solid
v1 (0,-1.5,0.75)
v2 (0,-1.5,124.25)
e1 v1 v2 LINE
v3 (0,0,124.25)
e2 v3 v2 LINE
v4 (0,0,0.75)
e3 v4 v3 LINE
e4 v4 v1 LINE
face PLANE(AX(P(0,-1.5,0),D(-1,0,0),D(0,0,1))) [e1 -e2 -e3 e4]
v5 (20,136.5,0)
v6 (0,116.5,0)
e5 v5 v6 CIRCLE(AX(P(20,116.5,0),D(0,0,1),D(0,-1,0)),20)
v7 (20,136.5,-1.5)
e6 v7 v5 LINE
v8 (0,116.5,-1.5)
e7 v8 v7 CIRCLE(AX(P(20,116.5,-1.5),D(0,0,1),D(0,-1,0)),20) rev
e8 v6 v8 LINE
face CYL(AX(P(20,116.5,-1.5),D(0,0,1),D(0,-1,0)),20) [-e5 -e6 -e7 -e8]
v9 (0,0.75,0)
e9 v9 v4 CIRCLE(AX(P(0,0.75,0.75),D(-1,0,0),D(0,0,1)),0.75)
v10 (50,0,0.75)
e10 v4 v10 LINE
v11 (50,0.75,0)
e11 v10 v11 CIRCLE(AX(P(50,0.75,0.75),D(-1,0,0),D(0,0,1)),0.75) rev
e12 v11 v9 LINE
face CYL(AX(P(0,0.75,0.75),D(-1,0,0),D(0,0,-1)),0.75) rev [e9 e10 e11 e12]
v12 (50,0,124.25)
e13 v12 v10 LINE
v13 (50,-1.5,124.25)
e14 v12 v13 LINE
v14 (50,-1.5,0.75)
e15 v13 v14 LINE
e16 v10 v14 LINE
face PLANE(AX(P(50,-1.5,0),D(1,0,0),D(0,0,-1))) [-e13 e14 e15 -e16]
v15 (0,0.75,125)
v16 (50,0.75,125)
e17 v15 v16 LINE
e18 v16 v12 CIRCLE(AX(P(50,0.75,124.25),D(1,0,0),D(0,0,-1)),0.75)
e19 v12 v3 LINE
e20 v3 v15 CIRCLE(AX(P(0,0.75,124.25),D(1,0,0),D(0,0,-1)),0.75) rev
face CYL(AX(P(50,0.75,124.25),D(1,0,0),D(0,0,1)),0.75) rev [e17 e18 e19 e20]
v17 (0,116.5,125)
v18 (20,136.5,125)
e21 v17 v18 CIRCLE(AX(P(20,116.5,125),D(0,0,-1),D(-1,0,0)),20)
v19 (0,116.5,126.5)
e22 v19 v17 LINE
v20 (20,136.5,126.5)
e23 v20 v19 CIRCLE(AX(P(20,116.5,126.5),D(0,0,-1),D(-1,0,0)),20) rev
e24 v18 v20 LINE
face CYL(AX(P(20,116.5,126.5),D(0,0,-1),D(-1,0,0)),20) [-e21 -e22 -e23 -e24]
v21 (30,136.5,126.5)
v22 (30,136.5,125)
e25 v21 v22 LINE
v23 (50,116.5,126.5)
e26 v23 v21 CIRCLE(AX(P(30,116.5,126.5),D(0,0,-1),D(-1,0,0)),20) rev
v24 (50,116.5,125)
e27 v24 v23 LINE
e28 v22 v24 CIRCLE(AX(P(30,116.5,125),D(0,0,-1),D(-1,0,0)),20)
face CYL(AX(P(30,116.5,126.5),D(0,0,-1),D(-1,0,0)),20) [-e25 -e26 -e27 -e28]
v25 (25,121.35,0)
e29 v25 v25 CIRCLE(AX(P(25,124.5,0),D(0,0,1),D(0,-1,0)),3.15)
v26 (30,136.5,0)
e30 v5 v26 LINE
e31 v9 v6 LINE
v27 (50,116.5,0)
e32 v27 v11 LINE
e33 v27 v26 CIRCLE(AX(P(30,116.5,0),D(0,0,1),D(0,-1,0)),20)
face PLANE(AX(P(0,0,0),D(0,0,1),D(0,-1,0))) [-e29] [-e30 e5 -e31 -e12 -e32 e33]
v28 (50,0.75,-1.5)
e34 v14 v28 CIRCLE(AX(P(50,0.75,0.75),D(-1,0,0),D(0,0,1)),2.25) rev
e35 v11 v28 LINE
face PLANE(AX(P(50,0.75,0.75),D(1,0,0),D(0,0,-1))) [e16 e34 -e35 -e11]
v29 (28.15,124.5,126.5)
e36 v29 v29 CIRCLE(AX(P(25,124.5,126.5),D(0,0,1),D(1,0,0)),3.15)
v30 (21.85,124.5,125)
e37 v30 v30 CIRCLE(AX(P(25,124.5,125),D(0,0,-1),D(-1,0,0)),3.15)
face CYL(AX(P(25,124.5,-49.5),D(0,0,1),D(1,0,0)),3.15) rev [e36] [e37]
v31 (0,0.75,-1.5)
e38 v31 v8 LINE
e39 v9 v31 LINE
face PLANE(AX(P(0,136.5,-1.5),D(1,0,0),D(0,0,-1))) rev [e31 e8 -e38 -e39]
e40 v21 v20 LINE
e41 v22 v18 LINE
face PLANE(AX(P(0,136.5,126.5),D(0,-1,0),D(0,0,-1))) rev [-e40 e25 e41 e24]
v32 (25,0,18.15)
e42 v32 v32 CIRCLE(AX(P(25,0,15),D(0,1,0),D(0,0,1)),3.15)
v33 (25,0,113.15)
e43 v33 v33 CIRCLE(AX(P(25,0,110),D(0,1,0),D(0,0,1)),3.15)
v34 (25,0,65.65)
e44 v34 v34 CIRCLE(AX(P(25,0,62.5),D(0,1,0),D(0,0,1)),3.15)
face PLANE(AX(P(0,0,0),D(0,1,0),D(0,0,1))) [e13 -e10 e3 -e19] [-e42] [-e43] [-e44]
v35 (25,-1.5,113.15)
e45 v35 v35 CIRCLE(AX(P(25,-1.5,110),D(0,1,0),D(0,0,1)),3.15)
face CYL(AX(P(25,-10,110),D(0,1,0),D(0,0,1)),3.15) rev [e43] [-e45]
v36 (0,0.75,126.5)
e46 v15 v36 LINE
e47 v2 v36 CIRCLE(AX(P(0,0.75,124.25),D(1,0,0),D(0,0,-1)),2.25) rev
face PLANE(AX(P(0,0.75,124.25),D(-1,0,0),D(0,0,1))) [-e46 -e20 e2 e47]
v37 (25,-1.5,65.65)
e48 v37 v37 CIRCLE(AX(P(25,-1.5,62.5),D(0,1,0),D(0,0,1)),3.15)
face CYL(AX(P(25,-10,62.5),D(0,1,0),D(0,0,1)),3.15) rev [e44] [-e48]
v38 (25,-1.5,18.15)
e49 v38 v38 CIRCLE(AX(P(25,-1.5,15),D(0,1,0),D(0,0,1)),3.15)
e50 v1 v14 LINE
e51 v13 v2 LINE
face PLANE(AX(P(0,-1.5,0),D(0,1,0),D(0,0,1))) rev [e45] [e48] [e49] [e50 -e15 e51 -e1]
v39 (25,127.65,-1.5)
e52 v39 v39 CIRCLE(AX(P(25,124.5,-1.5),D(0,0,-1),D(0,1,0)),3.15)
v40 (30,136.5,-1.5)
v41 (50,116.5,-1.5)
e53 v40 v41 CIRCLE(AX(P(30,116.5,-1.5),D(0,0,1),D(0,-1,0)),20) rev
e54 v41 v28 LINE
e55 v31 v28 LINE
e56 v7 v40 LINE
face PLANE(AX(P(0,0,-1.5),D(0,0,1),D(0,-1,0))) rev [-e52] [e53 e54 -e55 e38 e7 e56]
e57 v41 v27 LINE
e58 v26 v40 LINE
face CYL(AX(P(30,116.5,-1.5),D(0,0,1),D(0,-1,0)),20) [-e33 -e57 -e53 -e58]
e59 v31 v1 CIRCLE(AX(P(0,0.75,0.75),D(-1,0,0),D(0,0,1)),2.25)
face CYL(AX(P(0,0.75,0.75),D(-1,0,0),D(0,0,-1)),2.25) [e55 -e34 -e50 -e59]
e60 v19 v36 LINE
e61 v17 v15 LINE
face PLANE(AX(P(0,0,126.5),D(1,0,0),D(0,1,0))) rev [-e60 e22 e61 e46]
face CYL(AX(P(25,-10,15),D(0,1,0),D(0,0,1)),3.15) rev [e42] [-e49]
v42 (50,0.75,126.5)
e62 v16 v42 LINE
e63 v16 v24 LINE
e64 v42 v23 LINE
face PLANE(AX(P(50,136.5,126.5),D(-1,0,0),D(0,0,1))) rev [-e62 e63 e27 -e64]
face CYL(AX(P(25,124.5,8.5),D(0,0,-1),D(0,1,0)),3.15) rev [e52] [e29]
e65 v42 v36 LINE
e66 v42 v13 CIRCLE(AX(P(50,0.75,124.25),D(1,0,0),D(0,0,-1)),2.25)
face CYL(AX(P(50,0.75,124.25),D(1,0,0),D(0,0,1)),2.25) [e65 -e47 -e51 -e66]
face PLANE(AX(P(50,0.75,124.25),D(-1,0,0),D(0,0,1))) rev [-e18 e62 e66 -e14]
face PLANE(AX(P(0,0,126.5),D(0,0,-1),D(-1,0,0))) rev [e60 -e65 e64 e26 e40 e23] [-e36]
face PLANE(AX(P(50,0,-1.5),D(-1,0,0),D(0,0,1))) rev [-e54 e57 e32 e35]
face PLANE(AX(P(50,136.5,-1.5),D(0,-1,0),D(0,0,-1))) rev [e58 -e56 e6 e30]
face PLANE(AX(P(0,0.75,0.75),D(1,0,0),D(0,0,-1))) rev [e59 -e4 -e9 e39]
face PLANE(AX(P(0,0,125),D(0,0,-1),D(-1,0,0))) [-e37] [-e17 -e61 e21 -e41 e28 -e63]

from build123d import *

# Parameters (mm, degrees)
SKETCH1_W                    = 50
SKETCH1_H                    = 125
BASE_FLANGE1_DEPTH           = 1.5
EDGE_FLANGE1_STRIP_W         = 7.5
EDGE_FLANGE1_STRIP_H         = 1.5
EDGE_FLANGE1_STRIP_CUT_DEPTH = 50
EDGE_FLANGE1_DEPTH           = 50
SKETCH9_R                    = 3.15
CUT_EXTRUDE1_DEPTH           = 176
EDGE_FLANGE2_STRIP_W         = 7.5
EDGE_FLANGE2_STRIP_H         = 1.5
EDGE_FLANGE2_STRIP_CUT_DEPTH = 50
EDGE_FLANGE2_DEPTH           = 50
CUT_EXTRUDE2_START           = -10
SKETCH13_R                   = 3.15
CUT_EXTRUDE2_DEPTH           = 10
FILLET1_R                    = 20
SKETCH14_R                   = 3.15
CUT_EXTRUDE3_DEPTH           = 10


# Sheet-metal steps are written as plain solids
with BuildPart() as part:
    # Sketch1 → Base-Flange1 (new body)
    with BuildSketch(Plane(origin=(0, 0, 0), x_dir=(1, 0, 0), z_dir=(0, 1, 0))):
        with Locations((25, -62.5)):
            Rectangle(SKETCH1_W, SKETCH1_H)
    extrude(amount=-BASE_FLANGE1_DEPTH)

    # Edge-Flange1 strip (across the edge) → Edge-Flange1 strip cut (cut)
    with BuildSketch(Plane(origin=(0, 0, 125), x_dir=(0, 0, -1), z_dir=(1, 0, 0))):
        with Locations((-3, -0.75)):
            Rectangle(EDGE_FLANGE1_STRIP_W, EDGE_FLANGE1_STRIP_H)
    extrude(amount=EDGE_FLANGE1_STRIP_CUT_DEPTH, mode=Mode.SUBTRACT)

    # Edge-Flange1 section (across the edge) → Edge-Flange1 (add)
    with BuildSketch(Plane(origin=(0, 0, 125), x_dir=(0, 0, -1), z_dir=(1, 0, 0))):
        with BuildLine():
            Line((-1.5, 0.75), (-1.5, 136.5))
            Line((-1.5, 136.5), (0, 136.5))
            Line((0, 136.5), (0, 0.75))
            ThreePointArc((0, 0.75), (0.219669914, 0.219669914), (0.75, 0))
            Line((0.75, 0), (0.75, -1.5))
            ThreePointArc((0.75, -1.5), (-0.840990258, -0.840990258), (-1.5, 0.75))
        make_face()
    extrude(amount=EDGE_FLANGE1_DEPTH)

    # Sketch9 → Cut-Extrude1 (cut)
    with BuildSketch(Plane.XY.offset(126.5)):
        with Locations((25, 124.5)):
            Circle(SKETCH9_R)
    extrude(amount=-CUT_EXTRUDE1_DEPTH, mode=Mode.SUBTRACT)

    # Edge-Flange2 strip (across the edge) → Edge-Flange2 strip cut (cut)
    with BuildSketch(Plane.ZY.offset(-50)):
        with Locations((-3, -0.75)):
            Rectangle(EDGE_FLANGE2_STRIP_W, EDGE_FLANGE2_STRIP_H)
    extrude(amount=EDGE_FLANGE2_STRIP_CUT_DEPTH, mode=Mode.SUBTRACT)

    # Edge-Flange2 section (across the edge) → Edge-Flange2 (add)
    with BuildSketch(Plane.ZY.offset(-50)):
        with BuildLine():
            Line((-1.5, 0.75), (-1.5, 136.5))
            Line((-1.5, 136.5), (0, 136.5))
            Line((0, 136.5), (0, 0.75))
            ThreePointArc((0, 0.75), (0.219669914, 0.219669914), (0.75, 0))
            Line((0.75, 0), (0.75, -1.5))
            ThreePointArc((0.75, -1.5), (-0.840990258, -0.840990258), (-1.5, 0.75))
        make_face()
    extrude(amount=EDGE_FLANGE2_DEPTH)

    # Sketch13 → Cut-Extrude2 (cut)
    with BuildSketch(Plane(origin=(0, 0, -1.5), x_dir=(-1, 0, 0), z_dir=(0, 0, -1)).offset(CUT_EXTRUDE2_START)):
        with Locations(Location((-25, 124.5, 0), (0, 0, 180))):
            Circle(SKETCH13_R)
    extrude(amount=CUT_EXTRUDE2_DEPTH, mode=Mode.SUBTRACT)

    # Fillet1
    fillet1_edges = [part.edges().sort_by_distance(p)[0] for p in [
        (0, 136.5, 125.75),
        (50, 136.5, 125.75),
        (50, 136.5, -0.75),
        (0, 136.5, -0.75),
    ]]
    fillet(fillet1_edges, radius=FILLET1_R)

    # Sketch14 → Cut-Extrude3 (cut)
    with BuildSketch(Plane(origin=(0, 0, 0), x_dir=(1, 0, 0), z_dir=(0, 1, 0))):
        with Locations(Location((25, -15, 0), (0, 0, 270))):
            Circle(SKETCH14_R)
        with Locations(Location((25, -62.5, 0), (0, 0, 270))):
            Circle(SKETCH14_R)
        with Locations(Location((25, -110, 0), (0, 0, 270))):
            Circle(SKETCH14_R)
    extrude(amount=-CUT_EXTRUDE3_DEPTH, mode=Mode.SUBTRACT)


solid = part.part
